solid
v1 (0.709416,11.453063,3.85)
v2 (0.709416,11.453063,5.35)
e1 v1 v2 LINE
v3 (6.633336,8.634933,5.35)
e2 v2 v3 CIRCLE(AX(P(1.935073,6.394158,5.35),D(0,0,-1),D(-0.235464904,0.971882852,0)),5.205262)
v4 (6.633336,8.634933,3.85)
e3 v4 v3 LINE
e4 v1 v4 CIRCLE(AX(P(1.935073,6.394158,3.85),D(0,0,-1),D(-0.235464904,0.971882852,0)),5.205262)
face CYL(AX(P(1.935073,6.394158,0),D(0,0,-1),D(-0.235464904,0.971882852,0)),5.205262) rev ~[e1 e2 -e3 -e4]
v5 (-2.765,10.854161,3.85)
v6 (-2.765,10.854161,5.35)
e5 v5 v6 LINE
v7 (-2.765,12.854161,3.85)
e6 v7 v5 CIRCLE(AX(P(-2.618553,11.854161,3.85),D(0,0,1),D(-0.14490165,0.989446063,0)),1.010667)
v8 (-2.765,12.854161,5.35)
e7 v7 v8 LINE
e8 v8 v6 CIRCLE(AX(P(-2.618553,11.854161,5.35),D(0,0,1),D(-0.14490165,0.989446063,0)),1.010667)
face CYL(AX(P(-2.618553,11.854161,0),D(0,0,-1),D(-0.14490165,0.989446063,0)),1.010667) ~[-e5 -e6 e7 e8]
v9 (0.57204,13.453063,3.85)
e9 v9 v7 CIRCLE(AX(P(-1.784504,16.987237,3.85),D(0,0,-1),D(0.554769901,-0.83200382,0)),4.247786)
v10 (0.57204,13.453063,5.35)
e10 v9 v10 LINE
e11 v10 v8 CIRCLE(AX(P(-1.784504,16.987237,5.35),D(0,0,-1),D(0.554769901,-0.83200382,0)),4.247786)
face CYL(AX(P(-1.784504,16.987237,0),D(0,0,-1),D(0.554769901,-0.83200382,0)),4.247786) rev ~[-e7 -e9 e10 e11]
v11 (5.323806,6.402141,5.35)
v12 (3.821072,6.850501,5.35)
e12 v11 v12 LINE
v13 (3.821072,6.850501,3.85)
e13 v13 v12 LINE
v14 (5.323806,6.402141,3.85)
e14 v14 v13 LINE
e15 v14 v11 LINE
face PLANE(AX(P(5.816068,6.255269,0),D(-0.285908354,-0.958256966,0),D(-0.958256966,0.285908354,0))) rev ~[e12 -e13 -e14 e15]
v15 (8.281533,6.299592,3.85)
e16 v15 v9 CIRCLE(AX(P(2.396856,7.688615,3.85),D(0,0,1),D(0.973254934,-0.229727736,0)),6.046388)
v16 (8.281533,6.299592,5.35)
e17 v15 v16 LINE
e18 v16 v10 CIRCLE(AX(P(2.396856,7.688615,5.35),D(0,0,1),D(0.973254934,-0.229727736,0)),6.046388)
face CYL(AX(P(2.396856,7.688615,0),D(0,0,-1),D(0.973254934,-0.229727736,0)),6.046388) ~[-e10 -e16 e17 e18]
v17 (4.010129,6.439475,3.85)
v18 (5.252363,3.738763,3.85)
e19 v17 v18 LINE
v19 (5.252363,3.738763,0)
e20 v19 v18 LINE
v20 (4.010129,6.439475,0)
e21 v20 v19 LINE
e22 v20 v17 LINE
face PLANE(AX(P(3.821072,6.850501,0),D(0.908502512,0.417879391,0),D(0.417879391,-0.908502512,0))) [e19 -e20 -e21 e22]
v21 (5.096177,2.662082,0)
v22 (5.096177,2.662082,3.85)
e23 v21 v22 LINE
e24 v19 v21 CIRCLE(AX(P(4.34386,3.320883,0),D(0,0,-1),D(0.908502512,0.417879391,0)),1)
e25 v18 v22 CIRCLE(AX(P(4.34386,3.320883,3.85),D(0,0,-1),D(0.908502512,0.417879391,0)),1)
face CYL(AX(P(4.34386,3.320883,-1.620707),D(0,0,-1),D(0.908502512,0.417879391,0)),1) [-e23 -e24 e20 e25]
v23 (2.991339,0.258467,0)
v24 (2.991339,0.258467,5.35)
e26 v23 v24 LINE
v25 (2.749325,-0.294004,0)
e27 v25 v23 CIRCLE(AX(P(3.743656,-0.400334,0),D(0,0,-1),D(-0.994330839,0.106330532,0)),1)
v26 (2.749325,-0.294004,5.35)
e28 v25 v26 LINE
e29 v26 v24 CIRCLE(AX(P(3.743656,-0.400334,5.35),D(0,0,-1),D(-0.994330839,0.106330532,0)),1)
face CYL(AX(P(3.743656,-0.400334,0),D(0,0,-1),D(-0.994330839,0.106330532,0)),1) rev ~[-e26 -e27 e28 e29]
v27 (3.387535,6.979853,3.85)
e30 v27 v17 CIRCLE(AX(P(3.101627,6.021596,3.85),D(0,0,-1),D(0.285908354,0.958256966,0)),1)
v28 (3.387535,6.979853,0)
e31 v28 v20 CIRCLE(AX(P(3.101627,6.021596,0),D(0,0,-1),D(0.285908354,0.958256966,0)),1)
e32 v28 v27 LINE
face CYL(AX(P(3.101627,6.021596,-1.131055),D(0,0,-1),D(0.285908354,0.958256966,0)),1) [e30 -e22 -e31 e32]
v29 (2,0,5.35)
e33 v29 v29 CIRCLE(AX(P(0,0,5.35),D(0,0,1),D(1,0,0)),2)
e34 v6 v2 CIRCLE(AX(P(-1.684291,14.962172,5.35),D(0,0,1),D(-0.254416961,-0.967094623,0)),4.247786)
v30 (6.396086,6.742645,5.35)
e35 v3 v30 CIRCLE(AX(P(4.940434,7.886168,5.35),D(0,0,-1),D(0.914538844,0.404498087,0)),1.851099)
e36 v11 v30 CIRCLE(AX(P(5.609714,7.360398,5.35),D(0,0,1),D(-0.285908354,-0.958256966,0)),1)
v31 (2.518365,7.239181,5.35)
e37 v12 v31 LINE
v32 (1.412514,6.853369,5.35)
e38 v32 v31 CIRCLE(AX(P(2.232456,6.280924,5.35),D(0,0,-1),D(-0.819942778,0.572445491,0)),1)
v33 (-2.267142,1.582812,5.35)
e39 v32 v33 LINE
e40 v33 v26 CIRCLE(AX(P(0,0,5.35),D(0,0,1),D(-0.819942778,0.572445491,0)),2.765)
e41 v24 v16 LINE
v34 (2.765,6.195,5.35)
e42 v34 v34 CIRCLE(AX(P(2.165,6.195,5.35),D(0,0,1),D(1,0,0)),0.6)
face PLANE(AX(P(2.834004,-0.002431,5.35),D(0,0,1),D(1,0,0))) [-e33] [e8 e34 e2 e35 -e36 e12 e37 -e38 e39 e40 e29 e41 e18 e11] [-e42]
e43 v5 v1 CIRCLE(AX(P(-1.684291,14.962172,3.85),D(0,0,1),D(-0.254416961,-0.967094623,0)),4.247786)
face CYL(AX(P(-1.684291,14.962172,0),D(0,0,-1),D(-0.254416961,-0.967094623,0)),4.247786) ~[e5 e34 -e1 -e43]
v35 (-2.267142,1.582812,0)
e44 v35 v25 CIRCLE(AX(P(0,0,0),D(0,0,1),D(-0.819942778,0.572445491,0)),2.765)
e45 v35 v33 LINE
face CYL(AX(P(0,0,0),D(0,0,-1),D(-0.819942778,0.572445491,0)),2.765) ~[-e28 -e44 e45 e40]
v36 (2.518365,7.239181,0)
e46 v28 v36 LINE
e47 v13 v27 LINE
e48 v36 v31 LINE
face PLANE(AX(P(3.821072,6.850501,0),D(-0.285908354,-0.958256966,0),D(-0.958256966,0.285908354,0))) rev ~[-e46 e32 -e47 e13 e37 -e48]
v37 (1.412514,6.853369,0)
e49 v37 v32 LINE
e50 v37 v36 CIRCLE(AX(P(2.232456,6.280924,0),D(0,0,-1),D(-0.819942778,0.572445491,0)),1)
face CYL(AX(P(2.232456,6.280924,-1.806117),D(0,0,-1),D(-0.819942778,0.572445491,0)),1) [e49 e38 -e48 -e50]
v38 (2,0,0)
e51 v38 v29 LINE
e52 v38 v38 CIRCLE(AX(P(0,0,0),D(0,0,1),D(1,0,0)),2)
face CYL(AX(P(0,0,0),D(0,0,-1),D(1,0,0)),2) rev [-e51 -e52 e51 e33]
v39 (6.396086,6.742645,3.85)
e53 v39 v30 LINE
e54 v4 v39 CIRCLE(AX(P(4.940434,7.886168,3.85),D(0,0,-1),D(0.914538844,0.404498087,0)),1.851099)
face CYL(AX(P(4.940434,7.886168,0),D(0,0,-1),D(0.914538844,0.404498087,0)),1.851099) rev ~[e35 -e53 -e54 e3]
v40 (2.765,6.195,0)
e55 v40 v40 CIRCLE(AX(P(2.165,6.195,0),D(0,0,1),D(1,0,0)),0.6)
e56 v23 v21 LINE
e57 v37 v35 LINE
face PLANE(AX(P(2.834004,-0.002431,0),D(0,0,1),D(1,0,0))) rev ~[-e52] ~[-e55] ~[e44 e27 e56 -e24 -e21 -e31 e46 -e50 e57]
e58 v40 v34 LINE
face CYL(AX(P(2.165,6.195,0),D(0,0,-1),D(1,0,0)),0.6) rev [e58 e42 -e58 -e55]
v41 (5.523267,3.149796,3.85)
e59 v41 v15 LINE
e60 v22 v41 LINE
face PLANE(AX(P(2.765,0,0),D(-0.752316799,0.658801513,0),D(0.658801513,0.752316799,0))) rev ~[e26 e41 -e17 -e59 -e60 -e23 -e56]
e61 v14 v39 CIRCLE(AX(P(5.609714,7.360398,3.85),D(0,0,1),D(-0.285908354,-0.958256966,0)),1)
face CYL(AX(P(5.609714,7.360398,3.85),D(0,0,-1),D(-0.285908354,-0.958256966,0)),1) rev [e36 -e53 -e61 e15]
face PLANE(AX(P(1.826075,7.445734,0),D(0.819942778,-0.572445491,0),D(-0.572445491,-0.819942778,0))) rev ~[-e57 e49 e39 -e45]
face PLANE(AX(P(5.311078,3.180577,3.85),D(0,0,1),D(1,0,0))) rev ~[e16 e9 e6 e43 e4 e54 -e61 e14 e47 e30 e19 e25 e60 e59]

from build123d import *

# Parameters (mm, degrees)
F0_R        = 2
F0_R_2      = 0.6
F1_DEPTH    = 5.35
F2_DEPTH    = 3.85
F3_T1_DEPTH = 1.5
F3_T3_DEPTH = 5.35
F3_T5_DEPTH = 8.9622341314
F3_T7_DEPTH = 4.9810546268
F3_T9_DEPTH = 5.470707469


# Not quite as in the source:
# - a fillet or chamfer that OpenCascade refuses, or shapes differently, is made with other operations: its cross-section is extruded or revolved along the edge and cut away or added


with BuildPart() as f1:
    # F0 (on Top) → F1 (new body)
    with BuildSketch(Plane.XY):
        with BuildLine():
            ThreePointArc((-2.2671417814, 1.5828117838), (-0.8296318384, -2.637600427), (2.765, 0))
            Line((2.765, 0), (5.5232667008, 3.1497960053))
            Line((5.5232667008, 3.1497960053), (3.8210715694, 6.8505014831))
            Line((3.8210715694, 6.8505014831), (1.8260751385, 7.4457344599))
            Line((1.8260751385, 7.4457344599), (-2.2671417814, 1.5828117838))
        make_face()
        Circle(F0_R, mode=Mode.SUBTRACT)
        with Locations((2.165, 6.195)):
            Circle(F0_R_2, mode=Mode.SUBTRACT)
        with BuildLine():
            Line((3.8210715694, 6.8505014831), (5.5232667008, 3.1497960053))
            Line((5.5232667008, 3.1497960053), (8.2815334016, 6.2995920106))
            ThreePointArc((8.2815334016, 6.2995920106), (6.5094775109, 12.1209007662), (0.5720401491, 13.4530626491))
            ThreePointArc((0.5720401491, 13.4530626491), (-1.0341388497, 12.8062514702), (-2.765, 12.8541613445))
            ThreePointArc((-2.765, 12.8541613445), (-3.6292192652, 11.8541613445), (-2.765, 10.8541613445))
            ThreePointArc((-2.765, 10.8541613445), (-0.9627220535, 10.7761212346), (0.7094162112, 11.4530626491))
            ThreePointArc((0.7094162112, 11.4530626491), (4.1711880344, 11.0946407177), (6.6333355769, 8.6349334352))
            ThreePointArc((6.6333355769, 8.6349334352), (6.6911609557, 7.2849011256), (5.8160680002, 6.2552685064))
            Line((5.8160680002, 6.2552685064), (3.8210715694, 6.8505014831))
        make_face()
    extrude(amount=F1_DEPTH)

    # F0 (on Top) → F2 (cut)
    with BuildSketch(Plane.XY):
        with BuildLine():
            Line((3.8210715694, 6.8505014831), (5.5232667008, 3.1497960053))
            Line((5.5232667008, 3.1497960053), (8.2815334016, 6.2995920106))
            ThreePointArc((8.2815334016, 6.2995920106), (6.5094775109, 12.1209007662), (0.5720401491, 13.4530626491))
            ThreePointArc((0.5720401491, 13.4530626491), (-1.0341388497, 12.8062514702), (-2.765, 12.8541613445))
            ThreePointArc((-2.765, 12.8541613445), (-3.6292192652, 11.8541613445), (-2.765, 10.8541613445))
            ThreePointArc((-2.765, 10.8541613445), (-0.9627220535, 10.7761212346), (0.7094162112, 11.4530626491))
            ThreePointArc((0.7094162112, 11.4530626491), (4.1711880344, 11.0946407177), (6.6333355769, 8.6349334352))
            ThreePointArc((6.6333355769, 8.6349334352), (6.6911609557, 7.2849011256), (5.8160680002, 6.2552685064))
            Line((5.8160680002, 6.2552685064), (3.8210715694, 6.8505014831))
        make_face()
    extrude(amount=F2_DEPTH, mode=Mode.SUBTRACT)

    # F3: fillet of radius 1 on 5 edges, made by hand

    # F3_s2 → F3_t1 (join)
    with BuildSketch(Plane.XY.offset(3.85)):
        with BuildLine():
            ThreePointArc((5.3238056204, 6.4021413514), (5.9123715372, 6.4072989523), (6.3960858458, 6.7426449035))
            ThreePointArc((6.3960858458, 6.7426449035), (6.1312771268, 6.4689663976), (5.8160680002, 6.2552685064))
            Line((5.8160680002, 6.2552685064), (5.3238056204, 6.4021413514))
        make_face()
    extrude(amount=F3_T1_DEPTH)

    # F3_s4 → F3_t3 (join)
    with BuildSketch(Plane.XY):
        with BuildLine():
            ThreePointArc((2.7493247705, -0.294003922), (2.8276858836, 0.0009129267), (2.9913388108, 0.258467059))
            Line((2.9913388108, 0.258467059), (2.765, 0))
            ThreePointArc((2.765, 0), (2.7610784116, -0.1472107494), (2.7493247705, -0.294003922))
        make_face()
    extrude(amount=F3_T3_DEPTH)

    # F3_s6 → F3_t5 (cut)
    with BuildSketch(Plane.XY.offset(-1.8061170657)):
        with BuildLine():
            ThreePointArc((1.41251371, 6.8533694021), (1.9030466902, 7.2251109605), (2.5183648424, 7.2391808767))
            Line((2.5183648424, 7.2391808767), (1.8260751385, 7.4457344599))
            Line((1.8260751385, 7.4457344599), (1.41251371, 6.8533694021))
        make_face()
    extrude(amount=F3_T5_DEPTH, mode=Mode.SUBTRACT)

    # F3_s8 → F3_t7 (cut)
    with BuildSketch(Plane.XY.offset(-1.1310546268)):
        with BuildLine():
            ThreePointArc((3.3875351793, 6.9798526699), (3.757108564, 6.7768067273), (4.010129337, 6.4394750953))
            Line((4.010129337, 6.4394750953), (3.8210715694, 6.8505014831))
            Line((3.8210715694, 6.8505014831), (3.3875351793, 6.9798526699))
        make_face()
    extrude(amount=F3_T7_DEPTH, mode=Mode.SUBTRACT)

    # F3_s10 → F3_t9 (cut)
    with BuildSketch(Plane.XY.offset(-1.620707469)):
        with BuildLine():
            ThreePointArc((5.2523626005, 3.738762728), (5.3335017603, 3.1773237272), (5.0961768875, 2.6620818233))
            Line((5.0961768875, 2.6620818233), (5.5232667008, 3.1497960053))
            Line((5.5232667008, 3.1497960053), (5.2523626005, 3.738762728))
        make_face()
    extrude(amount=F3_T9_DEPTH, mode=Mode.SUBTRACT)


solid = f1.part
